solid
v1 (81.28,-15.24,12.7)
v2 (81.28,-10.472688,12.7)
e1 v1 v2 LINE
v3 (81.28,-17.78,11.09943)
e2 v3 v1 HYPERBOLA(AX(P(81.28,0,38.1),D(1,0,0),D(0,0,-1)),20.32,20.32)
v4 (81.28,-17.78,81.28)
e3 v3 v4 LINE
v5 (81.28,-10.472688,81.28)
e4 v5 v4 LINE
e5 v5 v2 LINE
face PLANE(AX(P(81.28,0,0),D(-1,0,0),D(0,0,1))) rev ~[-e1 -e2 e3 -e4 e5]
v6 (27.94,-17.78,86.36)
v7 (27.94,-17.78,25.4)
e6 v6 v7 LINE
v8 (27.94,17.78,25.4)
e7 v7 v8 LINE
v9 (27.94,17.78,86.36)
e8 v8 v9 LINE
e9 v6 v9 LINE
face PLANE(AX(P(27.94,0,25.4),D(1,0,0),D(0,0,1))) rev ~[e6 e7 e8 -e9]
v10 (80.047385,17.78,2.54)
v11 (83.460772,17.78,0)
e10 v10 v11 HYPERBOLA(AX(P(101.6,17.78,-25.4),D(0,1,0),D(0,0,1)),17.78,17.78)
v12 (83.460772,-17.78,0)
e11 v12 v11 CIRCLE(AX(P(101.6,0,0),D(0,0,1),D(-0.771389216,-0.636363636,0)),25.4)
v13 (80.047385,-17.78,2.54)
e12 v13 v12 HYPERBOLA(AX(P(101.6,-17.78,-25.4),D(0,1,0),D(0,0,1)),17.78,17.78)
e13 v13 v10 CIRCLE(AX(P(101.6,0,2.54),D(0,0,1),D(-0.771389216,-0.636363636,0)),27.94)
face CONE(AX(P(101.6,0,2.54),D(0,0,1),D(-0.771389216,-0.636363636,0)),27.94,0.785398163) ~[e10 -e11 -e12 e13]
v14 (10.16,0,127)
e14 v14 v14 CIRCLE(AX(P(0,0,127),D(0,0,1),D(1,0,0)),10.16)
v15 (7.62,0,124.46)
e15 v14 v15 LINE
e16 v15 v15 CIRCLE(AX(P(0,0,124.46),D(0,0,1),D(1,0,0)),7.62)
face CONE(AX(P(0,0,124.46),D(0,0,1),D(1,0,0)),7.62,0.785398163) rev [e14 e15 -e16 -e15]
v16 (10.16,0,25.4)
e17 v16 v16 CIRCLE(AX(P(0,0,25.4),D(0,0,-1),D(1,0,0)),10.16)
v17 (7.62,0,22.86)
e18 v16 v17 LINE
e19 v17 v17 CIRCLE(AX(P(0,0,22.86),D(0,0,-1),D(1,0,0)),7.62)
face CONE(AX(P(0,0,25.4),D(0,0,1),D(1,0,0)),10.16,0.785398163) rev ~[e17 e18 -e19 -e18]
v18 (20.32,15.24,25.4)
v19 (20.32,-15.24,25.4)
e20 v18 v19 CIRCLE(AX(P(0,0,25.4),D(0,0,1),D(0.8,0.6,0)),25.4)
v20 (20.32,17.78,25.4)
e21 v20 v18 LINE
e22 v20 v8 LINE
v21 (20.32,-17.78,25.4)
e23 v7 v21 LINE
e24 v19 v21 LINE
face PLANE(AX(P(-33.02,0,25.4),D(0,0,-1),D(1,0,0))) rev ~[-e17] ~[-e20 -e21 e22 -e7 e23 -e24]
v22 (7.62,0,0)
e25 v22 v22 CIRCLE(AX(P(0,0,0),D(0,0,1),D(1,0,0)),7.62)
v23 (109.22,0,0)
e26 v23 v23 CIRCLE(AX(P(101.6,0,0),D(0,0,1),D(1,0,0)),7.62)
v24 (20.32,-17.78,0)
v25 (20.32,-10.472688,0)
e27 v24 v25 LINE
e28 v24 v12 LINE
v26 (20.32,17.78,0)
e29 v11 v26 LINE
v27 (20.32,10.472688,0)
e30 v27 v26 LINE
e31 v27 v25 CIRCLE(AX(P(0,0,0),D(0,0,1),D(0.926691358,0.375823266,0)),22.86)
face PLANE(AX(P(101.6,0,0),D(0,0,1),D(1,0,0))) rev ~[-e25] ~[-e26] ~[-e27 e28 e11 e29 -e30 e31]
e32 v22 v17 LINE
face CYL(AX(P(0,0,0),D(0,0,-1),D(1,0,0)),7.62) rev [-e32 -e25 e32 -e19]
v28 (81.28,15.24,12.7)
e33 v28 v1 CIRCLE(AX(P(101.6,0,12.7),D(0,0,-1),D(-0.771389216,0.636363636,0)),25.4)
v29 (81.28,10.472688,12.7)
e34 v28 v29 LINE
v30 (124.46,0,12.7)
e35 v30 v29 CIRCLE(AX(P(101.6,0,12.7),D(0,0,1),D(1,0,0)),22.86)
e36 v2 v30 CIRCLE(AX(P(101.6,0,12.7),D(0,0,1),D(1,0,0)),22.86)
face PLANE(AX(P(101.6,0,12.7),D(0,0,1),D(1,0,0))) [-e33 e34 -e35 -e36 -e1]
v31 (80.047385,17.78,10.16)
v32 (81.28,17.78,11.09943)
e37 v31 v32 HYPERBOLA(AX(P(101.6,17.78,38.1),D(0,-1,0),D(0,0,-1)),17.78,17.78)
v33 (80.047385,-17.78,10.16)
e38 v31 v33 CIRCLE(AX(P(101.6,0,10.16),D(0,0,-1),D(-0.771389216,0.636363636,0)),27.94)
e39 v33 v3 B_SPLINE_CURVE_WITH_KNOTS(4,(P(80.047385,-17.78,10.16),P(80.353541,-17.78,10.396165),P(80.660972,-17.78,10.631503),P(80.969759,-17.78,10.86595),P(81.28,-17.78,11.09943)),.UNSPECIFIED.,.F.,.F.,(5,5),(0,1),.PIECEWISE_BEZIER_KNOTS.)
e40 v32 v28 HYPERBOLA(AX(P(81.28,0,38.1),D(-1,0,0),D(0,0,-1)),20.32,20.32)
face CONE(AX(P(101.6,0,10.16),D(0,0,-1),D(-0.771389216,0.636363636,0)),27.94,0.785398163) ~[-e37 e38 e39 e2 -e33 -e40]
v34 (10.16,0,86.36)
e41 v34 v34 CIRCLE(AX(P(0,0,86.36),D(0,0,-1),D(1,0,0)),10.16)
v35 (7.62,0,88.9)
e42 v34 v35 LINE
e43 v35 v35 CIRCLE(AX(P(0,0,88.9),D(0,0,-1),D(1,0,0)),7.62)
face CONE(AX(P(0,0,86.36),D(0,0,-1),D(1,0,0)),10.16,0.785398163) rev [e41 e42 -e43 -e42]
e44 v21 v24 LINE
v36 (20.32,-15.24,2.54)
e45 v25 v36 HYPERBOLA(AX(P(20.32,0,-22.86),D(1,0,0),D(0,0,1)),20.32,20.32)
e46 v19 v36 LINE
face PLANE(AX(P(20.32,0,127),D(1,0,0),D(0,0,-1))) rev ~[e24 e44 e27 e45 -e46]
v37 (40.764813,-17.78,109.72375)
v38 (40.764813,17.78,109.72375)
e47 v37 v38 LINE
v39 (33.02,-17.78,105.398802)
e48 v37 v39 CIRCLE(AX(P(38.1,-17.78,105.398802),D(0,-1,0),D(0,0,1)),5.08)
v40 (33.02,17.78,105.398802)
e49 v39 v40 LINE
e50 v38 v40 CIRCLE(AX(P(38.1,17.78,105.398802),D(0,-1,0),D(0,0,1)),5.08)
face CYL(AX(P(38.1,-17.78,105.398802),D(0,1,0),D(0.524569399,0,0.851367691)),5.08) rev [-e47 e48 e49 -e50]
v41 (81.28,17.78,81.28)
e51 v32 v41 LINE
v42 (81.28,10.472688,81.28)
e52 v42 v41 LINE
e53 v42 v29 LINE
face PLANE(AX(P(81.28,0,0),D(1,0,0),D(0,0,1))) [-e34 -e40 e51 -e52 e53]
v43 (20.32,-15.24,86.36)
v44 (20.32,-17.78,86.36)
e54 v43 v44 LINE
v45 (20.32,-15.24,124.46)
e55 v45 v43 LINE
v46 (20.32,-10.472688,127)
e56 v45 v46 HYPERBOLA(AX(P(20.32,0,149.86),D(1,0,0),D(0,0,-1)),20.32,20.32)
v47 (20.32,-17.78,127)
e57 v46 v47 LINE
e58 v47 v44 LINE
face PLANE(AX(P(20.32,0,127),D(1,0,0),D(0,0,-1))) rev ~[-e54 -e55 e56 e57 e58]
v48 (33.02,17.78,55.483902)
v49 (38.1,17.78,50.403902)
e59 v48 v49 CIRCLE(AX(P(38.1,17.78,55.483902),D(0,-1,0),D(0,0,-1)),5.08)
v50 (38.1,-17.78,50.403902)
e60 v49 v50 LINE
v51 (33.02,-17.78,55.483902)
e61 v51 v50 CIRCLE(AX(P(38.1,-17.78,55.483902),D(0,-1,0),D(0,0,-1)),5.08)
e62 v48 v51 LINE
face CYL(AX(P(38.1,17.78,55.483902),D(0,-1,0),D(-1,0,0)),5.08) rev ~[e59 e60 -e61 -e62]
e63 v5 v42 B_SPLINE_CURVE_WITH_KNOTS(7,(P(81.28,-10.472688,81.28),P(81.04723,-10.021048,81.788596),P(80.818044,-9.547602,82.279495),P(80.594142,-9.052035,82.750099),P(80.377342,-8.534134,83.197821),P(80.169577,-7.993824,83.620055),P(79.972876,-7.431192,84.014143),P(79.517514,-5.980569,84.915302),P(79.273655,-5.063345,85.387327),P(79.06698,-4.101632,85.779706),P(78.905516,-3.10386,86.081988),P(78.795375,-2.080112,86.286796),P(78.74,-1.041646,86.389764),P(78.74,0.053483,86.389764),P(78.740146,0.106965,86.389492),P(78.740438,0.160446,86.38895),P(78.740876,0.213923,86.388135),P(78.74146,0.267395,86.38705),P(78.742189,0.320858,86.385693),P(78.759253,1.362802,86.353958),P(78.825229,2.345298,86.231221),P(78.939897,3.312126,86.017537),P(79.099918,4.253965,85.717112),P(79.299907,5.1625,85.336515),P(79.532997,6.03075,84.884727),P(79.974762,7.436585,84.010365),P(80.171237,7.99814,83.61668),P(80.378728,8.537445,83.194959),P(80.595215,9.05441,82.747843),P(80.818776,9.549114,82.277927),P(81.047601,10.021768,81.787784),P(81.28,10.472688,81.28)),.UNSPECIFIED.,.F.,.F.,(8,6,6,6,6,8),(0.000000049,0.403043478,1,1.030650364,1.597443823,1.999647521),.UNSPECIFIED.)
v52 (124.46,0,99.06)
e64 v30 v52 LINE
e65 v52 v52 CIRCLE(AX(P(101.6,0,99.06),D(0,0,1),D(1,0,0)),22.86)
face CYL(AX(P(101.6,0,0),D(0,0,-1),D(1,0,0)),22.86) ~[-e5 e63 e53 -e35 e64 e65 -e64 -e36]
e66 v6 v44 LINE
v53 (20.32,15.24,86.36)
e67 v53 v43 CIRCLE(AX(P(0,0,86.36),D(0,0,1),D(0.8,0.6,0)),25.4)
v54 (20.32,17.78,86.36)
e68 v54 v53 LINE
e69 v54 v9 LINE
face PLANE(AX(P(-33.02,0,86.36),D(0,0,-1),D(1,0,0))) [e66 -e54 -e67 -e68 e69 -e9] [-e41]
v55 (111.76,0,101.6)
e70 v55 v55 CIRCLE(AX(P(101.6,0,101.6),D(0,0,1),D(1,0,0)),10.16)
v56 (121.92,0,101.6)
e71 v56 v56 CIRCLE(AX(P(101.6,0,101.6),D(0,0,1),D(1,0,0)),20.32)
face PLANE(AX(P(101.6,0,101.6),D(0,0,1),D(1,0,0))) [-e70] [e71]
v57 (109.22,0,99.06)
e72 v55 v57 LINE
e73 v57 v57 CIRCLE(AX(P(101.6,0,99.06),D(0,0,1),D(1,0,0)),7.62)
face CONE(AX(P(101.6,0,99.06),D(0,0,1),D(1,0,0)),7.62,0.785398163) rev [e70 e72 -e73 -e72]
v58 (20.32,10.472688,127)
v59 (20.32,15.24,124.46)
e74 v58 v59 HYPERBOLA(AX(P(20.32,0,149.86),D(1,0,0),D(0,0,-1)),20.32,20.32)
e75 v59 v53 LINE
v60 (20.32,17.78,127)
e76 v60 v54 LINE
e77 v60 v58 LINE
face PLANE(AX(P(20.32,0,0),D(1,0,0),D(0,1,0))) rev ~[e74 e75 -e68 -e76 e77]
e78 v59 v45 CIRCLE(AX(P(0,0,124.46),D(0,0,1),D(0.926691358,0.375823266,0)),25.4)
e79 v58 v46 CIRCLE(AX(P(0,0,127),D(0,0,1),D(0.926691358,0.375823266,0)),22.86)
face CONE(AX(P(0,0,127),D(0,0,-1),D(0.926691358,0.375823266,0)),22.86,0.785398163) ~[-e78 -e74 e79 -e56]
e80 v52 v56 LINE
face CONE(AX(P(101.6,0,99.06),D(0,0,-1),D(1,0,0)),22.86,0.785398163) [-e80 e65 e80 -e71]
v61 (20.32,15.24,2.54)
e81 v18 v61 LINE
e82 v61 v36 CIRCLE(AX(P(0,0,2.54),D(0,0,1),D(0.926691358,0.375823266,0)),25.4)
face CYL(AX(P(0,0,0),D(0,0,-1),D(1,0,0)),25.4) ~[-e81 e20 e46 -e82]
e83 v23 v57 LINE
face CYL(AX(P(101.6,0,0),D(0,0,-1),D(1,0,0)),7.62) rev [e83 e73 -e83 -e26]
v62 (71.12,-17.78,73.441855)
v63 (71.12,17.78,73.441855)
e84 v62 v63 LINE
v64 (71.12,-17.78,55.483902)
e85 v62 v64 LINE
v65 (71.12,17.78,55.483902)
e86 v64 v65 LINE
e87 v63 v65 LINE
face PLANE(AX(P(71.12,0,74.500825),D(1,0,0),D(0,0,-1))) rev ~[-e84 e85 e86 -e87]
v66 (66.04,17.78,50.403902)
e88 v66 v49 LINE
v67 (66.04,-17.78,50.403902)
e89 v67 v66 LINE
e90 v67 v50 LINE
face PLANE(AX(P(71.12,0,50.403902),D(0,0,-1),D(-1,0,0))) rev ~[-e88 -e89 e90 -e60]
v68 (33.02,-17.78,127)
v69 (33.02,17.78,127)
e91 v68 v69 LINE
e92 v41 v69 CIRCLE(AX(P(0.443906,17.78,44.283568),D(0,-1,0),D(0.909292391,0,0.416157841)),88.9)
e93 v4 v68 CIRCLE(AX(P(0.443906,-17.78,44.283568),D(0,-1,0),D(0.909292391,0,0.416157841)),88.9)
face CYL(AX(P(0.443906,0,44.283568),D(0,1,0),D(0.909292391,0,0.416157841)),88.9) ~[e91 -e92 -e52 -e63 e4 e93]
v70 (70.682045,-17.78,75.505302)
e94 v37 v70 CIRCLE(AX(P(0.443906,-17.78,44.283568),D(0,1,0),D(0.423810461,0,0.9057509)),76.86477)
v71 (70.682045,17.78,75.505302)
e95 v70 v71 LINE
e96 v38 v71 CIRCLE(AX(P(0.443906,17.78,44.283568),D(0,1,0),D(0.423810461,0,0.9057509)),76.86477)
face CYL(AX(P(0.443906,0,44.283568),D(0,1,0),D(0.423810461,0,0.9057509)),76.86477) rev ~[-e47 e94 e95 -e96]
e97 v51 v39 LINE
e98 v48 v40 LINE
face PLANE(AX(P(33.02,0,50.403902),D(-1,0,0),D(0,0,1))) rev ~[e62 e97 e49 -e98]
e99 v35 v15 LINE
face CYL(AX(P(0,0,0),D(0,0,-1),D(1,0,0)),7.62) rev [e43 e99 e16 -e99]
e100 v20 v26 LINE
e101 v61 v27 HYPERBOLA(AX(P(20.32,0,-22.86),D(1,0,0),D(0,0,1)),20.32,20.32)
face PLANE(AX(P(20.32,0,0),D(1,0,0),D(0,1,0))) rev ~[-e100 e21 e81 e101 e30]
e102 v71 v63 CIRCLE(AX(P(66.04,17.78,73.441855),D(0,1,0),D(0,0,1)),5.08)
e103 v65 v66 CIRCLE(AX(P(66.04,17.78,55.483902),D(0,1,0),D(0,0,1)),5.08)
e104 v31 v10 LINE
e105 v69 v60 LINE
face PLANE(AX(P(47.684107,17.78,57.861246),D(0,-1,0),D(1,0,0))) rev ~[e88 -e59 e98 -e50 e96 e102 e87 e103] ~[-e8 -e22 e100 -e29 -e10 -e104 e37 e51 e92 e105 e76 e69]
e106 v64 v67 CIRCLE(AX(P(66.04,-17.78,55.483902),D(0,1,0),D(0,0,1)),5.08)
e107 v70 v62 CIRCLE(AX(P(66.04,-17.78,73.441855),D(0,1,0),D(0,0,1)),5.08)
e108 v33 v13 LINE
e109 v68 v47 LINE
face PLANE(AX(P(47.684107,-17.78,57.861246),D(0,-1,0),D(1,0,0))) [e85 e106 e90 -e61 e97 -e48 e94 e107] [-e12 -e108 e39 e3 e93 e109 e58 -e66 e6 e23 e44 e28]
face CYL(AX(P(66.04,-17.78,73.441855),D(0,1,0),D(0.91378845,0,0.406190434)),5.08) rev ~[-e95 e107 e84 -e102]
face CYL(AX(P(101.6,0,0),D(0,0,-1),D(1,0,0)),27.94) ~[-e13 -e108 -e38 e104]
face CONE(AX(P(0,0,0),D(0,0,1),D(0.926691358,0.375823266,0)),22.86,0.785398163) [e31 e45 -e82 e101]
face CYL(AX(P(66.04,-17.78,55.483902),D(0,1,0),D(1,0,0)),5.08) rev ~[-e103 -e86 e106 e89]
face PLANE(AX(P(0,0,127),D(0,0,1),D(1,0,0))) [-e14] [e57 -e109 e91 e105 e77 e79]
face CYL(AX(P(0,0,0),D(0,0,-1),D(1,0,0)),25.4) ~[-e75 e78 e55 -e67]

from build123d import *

# Parameters (mm, degrees)
F0_R          = 25.4
F0_R_2        = 7.62
F1_DEPTH      = 127
F0_R_3        = 22.86
F2_DEPTH      = 101.6
F4_DEPTH      = 17.78
F4_DEPTH_BACK = 17.78
F5_W          = 60.96
F5_H          = 60.96
F6_DEPTH      = 25.4
F6_DEPTH_BACK = 25.4
F7_R          = 5.08
F8_T4_ANGLE   = 315.8495903275
F8_T13_ANGLE  = 315.8495903275
F9_R          = 27.94
F9_R_2        = 22.86
F10_DEPTH     = 12.7
F11_SIZE      = 2.54


# Not quite as in the source:
# - a fillet or chamfer that OpenCascade refuses, or shapes differently, is made with other operations: its cross-section is extruded or revolved along the edge and cut away or added


with BuildPart() as f1:
    # F0 (on Top) → F1 (new body)
    with BuildSketch(Plane.XY):
        Circle(F0_R)
        Circle(F0_R_2, mode=Mode.SUBTRACT)
    extrude(amount=F1_DEPTH)



with BuildPart() as f2:
    # F0 (on Top) → F2 (new body)
    with BuildSketch(Plane.XY):
        with Locations((101.6, 0)):
            Circle(F0_R_3)
        with Locations((101.6, 0)):
            Circle(F0_R_2, mode=Mode.SUBTRACT)
    extrude(amount=F2_DEPTH)


with BuildPart() as f1_1:
    add(f1.part)

    add(f2.part)  # F4 merges F2
    # F3 (on Front) → F4 (join, two sides)
    with BuildSketch(Plane.XZ) as f4_sk:
        with BuildLine():
            Line((20.32, 127), (20.32, 0))
            Line((20.32, 0), (81.28, 0))
            Line((81.28, 0), (81.28, 81.28))
            ThreePointArc((81.28, 81.28), (61.5844056789, 108.82076155), (33.02, 127))
            Line((33.02, 127), (20.32, 127))
        make_face()
        with BuildLine():
            Line((33.02, 50.4039023765), (33.02, 113.9039023765))
            ThreePointArc((33.02, 113.9039023765), (55.7015227305, 97.7137904926), (71.12, 74.5008252602))
            Line((71.12, 74.5008252602), (71.12, 50.4039023765))
            Line((71.12, 50.4039023765), (33.02, 50.4039023765))
        make_face(mode=Mode.SUBTRACT)
    extrude(amount=F4_DEPTH)
    extrude(f4_sk.sketch, amount=-F4_DEPTH_BACK)

    # F5 (on Front) → F6 (cut, two sides)
    with BuildSketch(Plane.XZ) as f6_sk:
        with Locations((-2.54, 55.88)):
            Rectangle(F5_W, F5_H)
    extrude(amount=F6_DEPTH, mode=Mode.SUBTRACT)
    extrude(f6_sk.sketch, amount=-F6_DEPTH_BACK, mode=Mode.SUBTRACT)

    # F7
    f7_edges = [f1_1.edges().sort_by_distance(p)[0] for p in [
        (33.02, 0, 113.903902),
        (33.02, 0, 50.403902),
        (71.12, 0, 50.403902),
        (71.12, 0, 74.500825),
    ]]
    fillet(f7_edges, radius=F7_R)

    # F8: chamfer of 2.54 on 4 edges, made by hand


with BuildPart() as f8_tool2:
    # F8_s3 → F8_t4 (revolve)
    with BuildSketch(Plane(origin=(0, 0, 0), x_dir=(0, 0, 1), z_dir=(0.3758232659, -0.9266913579, 0))):
        Polygon((0, -22.86), (2.54, -25.4), (0, -25.4), align=None)
    revolve(axis=Axis((0, 0, 0), (0, 0, 1)), revolution_arc=F8_T4_ANGLE)

    split(bisect_by=Plane.YZ.offset(20.32), keep=Keep.BOTTOM)


with BuildPart() as f1_2:
    add(f1_1.part)

    # F8_t1: cut F8_tool2
    add(f8_tool2.part, mode=Mode.SUBTRACT)

    # F8_s6 → F8_t7 (revolve, cut)
    with BuildSketch(Plane.XZ):
        Polygon((10.16, 25.4), (7.62, 22.86), (7.62, 25.4), align=None)
    revolve(axis=Axis((0, 0, 25.4), (0, 0, -1)), mode=Mode.SUBTRACT)

    # F8_s8 → F8_t9 (revolve, cut)
    with BuildSketch(Plane.XZ):
        Polygon((10.16, 86.36), (7.62, 88.9), (7.62, 86.36), align=None)
    revolve(axis=Axis((0, 0, 86.36), (0, 0, -1)), mode=Mode.SUBTRACT)


with BuildPart() as f8_tool11:
    # F8_s12 → F8_t13 (revolve)
    with BuildSketch(Plane(origin=(0, 0, 0), x_dir=(0, 0, 1), z_dir=(0.3758232659, -0.9266913579, 0))):
        Polygon((127, -22.86), (124.46, -25.4), (127, -25.4), align=None)
    revolve(axis=Axis((0, 0, 127), (0, 0, 1)), revolution_arc=F8_T13_ANGLE)

    split(bisect_by=Plane.YZ.offset(20.32), keep=Keep.BOTTOM)


with BuildPart() as f1_3:
    add(f1_2.part)

    # F8_t10: cut F8_tool11
    add(f8_tool11.part, mode=Mode.SUBTRACT)

    # F9 (on Top) → F10 (join)
    with BuildSketch(Plane.XY):
        with Locations((101.6, 0)):
            Circle(F9_R)
        with Locations((101.6, 0)):
            Circle(F9_R_2, mode=Mode.SUBTRACT)
    extrude(amount=F10_DEPTH)

    # F11
    f11_edges = [f1_3.edges().sort_by_distance(p)[0] for p in [
        (129.54, 0, 0),
        (129.54, 0, 12.7),
        (78.74, 0, 101.6),
        (93.98, 0, 101.6),
        (-7.62, 0, 127),
    ]]
    chamfer(f11_edges, length=F11_SIZE)


solid = f1_3.part
